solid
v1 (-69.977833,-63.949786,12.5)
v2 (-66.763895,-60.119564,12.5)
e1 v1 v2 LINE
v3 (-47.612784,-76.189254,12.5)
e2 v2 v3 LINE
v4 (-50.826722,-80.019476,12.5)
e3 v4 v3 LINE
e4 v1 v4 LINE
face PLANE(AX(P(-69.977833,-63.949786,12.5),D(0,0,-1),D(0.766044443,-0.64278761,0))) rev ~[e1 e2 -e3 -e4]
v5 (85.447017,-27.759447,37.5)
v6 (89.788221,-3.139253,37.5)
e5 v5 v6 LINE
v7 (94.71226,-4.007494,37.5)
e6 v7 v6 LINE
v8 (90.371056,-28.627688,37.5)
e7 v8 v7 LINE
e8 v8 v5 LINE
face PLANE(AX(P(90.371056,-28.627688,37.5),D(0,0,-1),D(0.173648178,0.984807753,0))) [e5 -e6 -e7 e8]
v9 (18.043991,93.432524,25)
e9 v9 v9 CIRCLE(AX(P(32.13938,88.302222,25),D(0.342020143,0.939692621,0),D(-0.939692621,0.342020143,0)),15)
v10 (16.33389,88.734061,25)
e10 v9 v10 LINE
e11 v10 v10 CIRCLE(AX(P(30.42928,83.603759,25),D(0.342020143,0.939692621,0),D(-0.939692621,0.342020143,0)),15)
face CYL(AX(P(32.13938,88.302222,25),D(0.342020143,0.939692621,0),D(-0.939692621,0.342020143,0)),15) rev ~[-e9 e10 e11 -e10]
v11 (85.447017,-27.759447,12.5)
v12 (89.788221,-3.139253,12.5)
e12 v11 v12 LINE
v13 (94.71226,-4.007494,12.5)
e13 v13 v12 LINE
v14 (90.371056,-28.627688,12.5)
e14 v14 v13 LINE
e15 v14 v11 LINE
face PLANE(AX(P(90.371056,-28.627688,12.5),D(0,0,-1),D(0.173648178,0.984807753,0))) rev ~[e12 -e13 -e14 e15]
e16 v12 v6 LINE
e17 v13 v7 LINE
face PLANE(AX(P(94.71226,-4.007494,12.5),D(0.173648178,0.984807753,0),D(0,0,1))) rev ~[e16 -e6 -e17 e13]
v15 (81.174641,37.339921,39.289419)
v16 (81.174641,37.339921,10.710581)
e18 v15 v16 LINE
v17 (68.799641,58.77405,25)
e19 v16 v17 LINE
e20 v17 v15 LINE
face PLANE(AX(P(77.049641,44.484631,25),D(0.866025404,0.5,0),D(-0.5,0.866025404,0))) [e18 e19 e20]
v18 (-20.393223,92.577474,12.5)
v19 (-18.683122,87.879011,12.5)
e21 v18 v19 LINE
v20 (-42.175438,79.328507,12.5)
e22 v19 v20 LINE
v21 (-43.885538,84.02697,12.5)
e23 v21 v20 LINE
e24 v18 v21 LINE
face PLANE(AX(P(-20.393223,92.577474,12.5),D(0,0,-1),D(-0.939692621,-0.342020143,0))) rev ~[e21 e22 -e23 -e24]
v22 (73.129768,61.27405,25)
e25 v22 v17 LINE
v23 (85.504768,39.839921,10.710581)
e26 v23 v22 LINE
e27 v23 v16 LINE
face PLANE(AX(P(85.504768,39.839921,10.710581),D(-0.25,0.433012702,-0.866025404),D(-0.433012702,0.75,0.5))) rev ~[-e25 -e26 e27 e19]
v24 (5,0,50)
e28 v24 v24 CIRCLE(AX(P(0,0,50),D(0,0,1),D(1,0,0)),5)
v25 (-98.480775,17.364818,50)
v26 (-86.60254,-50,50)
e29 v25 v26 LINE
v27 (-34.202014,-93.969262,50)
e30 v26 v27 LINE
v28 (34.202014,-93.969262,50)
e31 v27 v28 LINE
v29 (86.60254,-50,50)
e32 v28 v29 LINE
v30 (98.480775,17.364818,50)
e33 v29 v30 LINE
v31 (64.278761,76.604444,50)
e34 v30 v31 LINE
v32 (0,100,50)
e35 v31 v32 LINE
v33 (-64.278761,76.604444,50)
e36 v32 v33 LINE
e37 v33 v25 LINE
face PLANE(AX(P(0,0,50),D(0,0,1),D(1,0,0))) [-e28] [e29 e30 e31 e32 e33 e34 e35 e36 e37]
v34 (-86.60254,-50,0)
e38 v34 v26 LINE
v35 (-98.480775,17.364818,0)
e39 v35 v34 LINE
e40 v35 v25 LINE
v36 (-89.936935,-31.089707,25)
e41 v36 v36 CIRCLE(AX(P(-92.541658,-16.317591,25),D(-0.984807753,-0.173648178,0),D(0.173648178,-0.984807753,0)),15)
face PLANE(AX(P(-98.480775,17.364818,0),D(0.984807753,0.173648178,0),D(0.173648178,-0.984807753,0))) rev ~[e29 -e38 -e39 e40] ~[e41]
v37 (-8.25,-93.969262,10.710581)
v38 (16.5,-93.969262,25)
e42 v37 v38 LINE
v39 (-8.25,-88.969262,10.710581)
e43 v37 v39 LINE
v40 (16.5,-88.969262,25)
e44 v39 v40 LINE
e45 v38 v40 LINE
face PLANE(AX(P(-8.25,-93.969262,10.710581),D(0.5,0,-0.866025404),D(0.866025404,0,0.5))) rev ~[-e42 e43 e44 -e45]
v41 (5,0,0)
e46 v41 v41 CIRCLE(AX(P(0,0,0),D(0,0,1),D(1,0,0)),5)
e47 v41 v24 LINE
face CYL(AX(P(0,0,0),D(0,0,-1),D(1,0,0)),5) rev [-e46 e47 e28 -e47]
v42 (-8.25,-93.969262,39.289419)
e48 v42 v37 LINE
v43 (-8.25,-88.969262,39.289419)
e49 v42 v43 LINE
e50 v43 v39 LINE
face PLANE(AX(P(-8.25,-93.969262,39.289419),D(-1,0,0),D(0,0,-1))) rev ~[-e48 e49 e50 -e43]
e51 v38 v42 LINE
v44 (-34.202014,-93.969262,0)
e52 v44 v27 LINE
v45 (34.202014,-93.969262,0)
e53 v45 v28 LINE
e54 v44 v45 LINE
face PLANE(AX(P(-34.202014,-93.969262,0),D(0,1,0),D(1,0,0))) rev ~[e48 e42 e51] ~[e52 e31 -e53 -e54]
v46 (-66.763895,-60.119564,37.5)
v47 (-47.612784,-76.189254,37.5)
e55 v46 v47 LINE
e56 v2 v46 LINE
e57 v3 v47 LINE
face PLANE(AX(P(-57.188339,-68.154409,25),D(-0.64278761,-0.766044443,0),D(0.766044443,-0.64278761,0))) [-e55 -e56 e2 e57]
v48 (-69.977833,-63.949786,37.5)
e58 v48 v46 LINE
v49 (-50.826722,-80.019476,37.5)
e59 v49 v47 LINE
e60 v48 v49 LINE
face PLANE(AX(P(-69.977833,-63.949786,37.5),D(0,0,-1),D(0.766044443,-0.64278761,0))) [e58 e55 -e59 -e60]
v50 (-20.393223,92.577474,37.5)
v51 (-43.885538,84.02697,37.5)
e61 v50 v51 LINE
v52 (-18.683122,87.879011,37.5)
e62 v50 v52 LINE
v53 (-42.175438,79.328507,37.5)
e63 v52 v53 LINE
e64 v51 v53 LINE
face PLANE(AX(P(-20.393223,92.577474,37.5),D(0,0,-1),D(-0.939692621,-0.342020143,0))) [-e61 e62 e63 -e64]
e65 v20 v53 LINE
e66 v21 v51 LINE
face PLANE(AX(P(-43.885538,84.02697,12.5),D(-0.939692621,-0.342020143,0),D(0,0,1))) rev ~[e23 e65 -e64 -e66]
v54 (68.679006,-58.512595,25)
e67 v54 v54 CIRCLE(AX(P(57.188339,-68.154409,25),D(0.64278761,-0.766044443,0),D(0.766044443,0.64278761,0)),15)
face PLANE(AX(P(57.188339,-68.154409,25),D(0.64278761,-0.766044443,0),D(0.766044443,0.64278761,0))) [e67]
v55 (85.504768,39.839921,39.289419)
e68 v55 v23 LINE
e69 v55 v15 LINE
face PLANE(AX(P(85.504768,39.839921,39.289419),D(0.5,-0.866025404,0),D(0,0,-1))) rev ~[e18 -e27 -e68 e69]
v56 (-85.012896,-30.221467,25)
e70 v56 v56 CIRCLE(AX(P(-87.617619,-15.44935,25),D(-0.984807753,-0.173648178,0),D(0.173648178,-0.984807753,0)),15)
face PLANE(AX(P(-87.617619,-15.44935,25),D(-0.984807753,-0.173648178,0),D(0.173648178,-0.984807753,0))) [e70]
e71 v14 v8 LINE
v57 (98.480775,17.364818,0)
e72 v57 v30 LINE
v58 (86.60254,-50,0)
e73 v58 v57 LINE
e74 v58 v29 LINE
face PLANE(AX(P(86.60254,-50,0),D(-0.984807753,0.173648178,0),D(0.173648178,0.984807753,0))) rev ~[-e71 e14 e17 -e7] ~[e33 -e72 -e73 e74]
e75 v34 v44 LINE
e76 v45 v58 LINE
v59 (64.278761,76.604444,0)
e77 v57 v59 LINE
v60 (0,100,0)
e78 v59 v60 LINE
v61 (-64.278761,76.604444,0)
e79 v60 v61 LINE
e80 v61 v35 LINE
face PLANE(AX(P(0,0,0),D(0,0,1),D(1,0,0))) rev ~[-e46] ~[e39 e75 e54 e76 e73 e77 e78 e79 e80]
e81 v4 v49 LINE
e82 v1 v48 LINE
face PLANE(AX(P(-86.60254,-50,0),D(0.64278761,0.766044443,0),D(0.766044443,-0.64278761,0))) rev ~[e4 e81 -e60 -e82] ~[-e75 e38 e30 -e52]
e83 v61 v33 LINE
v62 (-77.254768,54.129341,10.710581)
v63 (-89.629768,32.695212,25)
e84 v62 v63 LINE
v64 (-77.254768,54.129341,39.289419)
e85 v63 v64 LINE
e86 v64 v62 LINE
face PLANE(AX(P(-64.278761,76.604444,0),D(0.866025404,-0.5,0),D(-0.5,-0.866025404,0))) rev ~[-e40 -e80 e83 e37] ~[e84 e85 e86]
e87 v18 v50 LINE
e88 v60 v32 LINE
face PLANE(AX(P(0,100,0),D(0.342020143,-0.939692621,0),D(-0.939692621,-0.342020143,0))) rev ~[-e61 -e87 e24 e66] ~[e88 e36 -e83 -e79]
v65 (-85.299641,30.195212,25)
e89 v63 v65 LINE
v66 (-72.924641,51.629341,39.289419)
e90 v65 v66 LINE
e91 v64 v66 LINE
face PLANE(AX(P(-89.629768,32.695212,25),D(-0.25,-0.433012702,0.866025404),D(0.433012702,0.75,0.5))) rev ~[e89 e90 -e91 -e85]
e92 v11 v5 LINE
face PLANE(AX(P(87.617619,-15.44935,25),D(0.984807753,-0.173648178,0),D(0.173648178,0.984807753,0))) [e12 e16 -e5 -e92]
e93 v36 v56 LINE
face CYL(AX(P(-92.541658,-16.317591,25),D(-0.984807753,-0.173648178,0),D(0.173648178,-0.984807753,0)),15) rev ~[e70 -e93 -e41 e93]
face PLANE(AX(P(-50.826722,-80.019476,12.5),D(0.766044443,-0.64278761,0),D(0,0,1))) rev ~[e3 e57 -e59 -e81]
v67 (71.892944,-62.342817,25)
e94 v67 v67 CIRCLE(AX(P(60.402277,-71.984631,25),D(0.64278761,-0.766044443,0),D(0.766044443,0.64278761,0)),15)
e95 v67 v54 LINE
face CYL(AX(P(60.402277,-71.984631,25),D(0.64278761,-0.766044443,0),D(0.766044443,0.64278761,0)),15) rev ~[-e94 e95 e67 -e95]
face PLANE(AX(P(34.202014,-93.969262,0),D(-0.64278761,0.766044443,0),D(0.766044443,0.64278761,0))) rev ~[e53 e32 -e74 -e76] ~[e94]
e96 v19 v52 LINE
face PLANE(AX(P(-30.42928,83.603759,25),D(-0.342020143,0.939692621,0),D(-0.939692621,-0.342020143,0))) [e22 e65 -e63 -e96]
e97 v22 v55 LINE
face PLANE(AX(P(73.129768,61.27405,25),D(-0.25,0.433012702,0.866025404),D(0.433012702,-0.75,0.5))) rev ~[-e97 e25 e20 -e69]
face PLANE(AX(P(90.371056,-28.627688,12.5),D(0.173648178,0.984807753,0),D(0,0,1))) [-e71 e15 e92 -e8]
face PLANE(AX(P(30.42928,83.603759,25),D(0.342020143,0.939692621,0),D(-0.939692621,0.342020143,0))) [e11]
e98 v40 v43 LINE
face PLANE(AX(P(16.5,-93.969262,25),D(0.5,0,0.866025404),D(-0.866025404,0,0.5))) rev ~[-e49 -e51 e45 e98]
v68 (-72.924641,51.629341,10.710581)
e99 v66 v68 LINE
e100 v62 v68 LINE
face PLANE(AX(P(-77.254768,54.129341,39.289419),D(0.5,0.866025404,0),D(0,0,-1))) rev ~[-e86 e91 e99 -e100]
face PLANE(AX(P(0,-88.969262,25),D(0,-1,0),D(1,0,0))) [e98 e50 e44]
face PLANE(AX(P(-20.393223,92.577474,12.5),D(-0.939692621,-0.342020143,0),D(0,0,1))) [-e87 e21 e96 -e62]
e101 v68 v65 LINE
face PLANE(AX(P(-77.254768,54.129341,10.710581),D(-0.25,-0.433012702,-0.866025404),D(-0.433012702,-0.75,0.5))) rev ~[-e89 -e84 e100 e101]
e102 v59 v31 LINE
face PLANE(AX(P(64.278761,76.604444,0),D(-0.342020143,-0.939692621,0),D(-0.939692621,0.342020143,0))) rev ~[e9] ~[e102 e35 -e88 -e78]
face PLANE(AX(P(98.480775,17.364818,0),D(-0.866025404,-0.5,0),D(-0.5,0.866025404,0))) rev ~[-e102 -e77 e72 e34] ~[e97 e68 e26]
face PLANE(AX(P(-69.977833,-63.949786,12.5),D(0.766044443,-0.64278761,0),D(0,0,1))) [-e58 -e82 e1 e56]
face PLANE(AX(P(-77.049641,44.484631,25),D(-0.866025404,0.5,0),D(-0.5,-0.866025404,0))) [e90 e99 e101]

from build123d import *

# Parameters (mm, degrees)
F0_R            = 5
F1_DEPTH        = 50
F2_R            = 15
F3_DEPTH        = 5
F3_COPIES_COUNT = 3
F4_W            = 25
F4_H            = 25
F5_DEPTH        = 5
F5_COPIES_COUNT = 3
F7_DEPTH        = 5
F7_COPIES_COUNT = 3


# Not quite as in the source:
# - a pattern or mirror of a feature is missing from the dataset's text; its kind, count and spacing are read off the source's solid


with BuildPart() as f1:
    # F0 (on Top) → F1 (new body)
    with BuildSketch(Plane.XY):
        Polygon((64.2787609687, 76.6044443119), (0, 100), (-64.2787609687, 76.6044443119), (-98.4807753012, 17.3648177667), (-86.6025403784, -50), (-34.2020143326, -93.9692620786), (34.2020143326, -93.9692620786), (86.6025403784, -50), (98.4807753012, 17.3648177667), align=None)
        Circle(F0_R, mode=Mode.SUBTRACT)
    extrude(amount=F1_DEPTH)

    # F2 (on face) → F3 (cut)
    with BuildSketch(Plane(origin=(60.4022773555, -71.9846310393, 0), x_dir=(0.7660444431, 0.6427876097, 0), z_dir=(0.6427876097, -0.7660444431, 0))):
        with Locations((0, 25)):
            Circle(F2_R)
    f3 = extrude(amount=-F3_DEPTH, mode=Mode.SUBTRACT)

    # F3_copies: F3 ×3 about axis
    f3_copies_axis = Axis((0, 0, 0), (0, 0, 1))
    for i in range(1, F3_COPIES_COUNT):
        add(f3.rotate(f3_copies_axis, i * 360 / F3_COPIES_COUNT), mode=Mode.SUBTRACT)

    # F4 (on face) → F5 (cut)
    with BuildSketch(Plane(origin=(-60.4022773555, -71.9846310393, 0), x_dir=(0.7660444431, -0.6427876097, 0), z_dir=(-0.6427876097, -0.7660444431, 0))):
        with Locations((0, 25)):
            Rectangle(F4_W, F4_H)
    f5 = extrude(amount=-F5_DEPTH, mode=Mode.SUBTRACT)

    # F5_copies: F5 ×3 about axis
    f5_copies_axis = Axis((0, 0, 0), (0, 0, 1))
    for i in range(1, F5_COPIES_COUNT):
        add(f5.rotate(f5_copies_axis, i * 360 / F5_COPIES_COUNT), mode=Mode.SUBTRACT)

    # F6 (on face) → F7 (cut)
    with BuildSketch(Plane.XZ.offset(93.9692620786)):
        Polygon((-8.25, 10.7105808376), (16.5, 25), (-8.25, 39.2894191624), align=None)
    f7 = extrude(amount=-F7_DEPTH, mode=Mode.SUBTRACT)

    # F7_copies: F7 ×3 about axis
    f7_copies_axis = Axis((0, 0, 0), (0, 0, 1))
    for i in range(1, F7_COPIES_COUNT):
        add(f7.rotate(f7_copies_axis, i * 360 / F7_COPIES_COUNT), mode=Mode.SUBTRACT)


solid = f1.part
